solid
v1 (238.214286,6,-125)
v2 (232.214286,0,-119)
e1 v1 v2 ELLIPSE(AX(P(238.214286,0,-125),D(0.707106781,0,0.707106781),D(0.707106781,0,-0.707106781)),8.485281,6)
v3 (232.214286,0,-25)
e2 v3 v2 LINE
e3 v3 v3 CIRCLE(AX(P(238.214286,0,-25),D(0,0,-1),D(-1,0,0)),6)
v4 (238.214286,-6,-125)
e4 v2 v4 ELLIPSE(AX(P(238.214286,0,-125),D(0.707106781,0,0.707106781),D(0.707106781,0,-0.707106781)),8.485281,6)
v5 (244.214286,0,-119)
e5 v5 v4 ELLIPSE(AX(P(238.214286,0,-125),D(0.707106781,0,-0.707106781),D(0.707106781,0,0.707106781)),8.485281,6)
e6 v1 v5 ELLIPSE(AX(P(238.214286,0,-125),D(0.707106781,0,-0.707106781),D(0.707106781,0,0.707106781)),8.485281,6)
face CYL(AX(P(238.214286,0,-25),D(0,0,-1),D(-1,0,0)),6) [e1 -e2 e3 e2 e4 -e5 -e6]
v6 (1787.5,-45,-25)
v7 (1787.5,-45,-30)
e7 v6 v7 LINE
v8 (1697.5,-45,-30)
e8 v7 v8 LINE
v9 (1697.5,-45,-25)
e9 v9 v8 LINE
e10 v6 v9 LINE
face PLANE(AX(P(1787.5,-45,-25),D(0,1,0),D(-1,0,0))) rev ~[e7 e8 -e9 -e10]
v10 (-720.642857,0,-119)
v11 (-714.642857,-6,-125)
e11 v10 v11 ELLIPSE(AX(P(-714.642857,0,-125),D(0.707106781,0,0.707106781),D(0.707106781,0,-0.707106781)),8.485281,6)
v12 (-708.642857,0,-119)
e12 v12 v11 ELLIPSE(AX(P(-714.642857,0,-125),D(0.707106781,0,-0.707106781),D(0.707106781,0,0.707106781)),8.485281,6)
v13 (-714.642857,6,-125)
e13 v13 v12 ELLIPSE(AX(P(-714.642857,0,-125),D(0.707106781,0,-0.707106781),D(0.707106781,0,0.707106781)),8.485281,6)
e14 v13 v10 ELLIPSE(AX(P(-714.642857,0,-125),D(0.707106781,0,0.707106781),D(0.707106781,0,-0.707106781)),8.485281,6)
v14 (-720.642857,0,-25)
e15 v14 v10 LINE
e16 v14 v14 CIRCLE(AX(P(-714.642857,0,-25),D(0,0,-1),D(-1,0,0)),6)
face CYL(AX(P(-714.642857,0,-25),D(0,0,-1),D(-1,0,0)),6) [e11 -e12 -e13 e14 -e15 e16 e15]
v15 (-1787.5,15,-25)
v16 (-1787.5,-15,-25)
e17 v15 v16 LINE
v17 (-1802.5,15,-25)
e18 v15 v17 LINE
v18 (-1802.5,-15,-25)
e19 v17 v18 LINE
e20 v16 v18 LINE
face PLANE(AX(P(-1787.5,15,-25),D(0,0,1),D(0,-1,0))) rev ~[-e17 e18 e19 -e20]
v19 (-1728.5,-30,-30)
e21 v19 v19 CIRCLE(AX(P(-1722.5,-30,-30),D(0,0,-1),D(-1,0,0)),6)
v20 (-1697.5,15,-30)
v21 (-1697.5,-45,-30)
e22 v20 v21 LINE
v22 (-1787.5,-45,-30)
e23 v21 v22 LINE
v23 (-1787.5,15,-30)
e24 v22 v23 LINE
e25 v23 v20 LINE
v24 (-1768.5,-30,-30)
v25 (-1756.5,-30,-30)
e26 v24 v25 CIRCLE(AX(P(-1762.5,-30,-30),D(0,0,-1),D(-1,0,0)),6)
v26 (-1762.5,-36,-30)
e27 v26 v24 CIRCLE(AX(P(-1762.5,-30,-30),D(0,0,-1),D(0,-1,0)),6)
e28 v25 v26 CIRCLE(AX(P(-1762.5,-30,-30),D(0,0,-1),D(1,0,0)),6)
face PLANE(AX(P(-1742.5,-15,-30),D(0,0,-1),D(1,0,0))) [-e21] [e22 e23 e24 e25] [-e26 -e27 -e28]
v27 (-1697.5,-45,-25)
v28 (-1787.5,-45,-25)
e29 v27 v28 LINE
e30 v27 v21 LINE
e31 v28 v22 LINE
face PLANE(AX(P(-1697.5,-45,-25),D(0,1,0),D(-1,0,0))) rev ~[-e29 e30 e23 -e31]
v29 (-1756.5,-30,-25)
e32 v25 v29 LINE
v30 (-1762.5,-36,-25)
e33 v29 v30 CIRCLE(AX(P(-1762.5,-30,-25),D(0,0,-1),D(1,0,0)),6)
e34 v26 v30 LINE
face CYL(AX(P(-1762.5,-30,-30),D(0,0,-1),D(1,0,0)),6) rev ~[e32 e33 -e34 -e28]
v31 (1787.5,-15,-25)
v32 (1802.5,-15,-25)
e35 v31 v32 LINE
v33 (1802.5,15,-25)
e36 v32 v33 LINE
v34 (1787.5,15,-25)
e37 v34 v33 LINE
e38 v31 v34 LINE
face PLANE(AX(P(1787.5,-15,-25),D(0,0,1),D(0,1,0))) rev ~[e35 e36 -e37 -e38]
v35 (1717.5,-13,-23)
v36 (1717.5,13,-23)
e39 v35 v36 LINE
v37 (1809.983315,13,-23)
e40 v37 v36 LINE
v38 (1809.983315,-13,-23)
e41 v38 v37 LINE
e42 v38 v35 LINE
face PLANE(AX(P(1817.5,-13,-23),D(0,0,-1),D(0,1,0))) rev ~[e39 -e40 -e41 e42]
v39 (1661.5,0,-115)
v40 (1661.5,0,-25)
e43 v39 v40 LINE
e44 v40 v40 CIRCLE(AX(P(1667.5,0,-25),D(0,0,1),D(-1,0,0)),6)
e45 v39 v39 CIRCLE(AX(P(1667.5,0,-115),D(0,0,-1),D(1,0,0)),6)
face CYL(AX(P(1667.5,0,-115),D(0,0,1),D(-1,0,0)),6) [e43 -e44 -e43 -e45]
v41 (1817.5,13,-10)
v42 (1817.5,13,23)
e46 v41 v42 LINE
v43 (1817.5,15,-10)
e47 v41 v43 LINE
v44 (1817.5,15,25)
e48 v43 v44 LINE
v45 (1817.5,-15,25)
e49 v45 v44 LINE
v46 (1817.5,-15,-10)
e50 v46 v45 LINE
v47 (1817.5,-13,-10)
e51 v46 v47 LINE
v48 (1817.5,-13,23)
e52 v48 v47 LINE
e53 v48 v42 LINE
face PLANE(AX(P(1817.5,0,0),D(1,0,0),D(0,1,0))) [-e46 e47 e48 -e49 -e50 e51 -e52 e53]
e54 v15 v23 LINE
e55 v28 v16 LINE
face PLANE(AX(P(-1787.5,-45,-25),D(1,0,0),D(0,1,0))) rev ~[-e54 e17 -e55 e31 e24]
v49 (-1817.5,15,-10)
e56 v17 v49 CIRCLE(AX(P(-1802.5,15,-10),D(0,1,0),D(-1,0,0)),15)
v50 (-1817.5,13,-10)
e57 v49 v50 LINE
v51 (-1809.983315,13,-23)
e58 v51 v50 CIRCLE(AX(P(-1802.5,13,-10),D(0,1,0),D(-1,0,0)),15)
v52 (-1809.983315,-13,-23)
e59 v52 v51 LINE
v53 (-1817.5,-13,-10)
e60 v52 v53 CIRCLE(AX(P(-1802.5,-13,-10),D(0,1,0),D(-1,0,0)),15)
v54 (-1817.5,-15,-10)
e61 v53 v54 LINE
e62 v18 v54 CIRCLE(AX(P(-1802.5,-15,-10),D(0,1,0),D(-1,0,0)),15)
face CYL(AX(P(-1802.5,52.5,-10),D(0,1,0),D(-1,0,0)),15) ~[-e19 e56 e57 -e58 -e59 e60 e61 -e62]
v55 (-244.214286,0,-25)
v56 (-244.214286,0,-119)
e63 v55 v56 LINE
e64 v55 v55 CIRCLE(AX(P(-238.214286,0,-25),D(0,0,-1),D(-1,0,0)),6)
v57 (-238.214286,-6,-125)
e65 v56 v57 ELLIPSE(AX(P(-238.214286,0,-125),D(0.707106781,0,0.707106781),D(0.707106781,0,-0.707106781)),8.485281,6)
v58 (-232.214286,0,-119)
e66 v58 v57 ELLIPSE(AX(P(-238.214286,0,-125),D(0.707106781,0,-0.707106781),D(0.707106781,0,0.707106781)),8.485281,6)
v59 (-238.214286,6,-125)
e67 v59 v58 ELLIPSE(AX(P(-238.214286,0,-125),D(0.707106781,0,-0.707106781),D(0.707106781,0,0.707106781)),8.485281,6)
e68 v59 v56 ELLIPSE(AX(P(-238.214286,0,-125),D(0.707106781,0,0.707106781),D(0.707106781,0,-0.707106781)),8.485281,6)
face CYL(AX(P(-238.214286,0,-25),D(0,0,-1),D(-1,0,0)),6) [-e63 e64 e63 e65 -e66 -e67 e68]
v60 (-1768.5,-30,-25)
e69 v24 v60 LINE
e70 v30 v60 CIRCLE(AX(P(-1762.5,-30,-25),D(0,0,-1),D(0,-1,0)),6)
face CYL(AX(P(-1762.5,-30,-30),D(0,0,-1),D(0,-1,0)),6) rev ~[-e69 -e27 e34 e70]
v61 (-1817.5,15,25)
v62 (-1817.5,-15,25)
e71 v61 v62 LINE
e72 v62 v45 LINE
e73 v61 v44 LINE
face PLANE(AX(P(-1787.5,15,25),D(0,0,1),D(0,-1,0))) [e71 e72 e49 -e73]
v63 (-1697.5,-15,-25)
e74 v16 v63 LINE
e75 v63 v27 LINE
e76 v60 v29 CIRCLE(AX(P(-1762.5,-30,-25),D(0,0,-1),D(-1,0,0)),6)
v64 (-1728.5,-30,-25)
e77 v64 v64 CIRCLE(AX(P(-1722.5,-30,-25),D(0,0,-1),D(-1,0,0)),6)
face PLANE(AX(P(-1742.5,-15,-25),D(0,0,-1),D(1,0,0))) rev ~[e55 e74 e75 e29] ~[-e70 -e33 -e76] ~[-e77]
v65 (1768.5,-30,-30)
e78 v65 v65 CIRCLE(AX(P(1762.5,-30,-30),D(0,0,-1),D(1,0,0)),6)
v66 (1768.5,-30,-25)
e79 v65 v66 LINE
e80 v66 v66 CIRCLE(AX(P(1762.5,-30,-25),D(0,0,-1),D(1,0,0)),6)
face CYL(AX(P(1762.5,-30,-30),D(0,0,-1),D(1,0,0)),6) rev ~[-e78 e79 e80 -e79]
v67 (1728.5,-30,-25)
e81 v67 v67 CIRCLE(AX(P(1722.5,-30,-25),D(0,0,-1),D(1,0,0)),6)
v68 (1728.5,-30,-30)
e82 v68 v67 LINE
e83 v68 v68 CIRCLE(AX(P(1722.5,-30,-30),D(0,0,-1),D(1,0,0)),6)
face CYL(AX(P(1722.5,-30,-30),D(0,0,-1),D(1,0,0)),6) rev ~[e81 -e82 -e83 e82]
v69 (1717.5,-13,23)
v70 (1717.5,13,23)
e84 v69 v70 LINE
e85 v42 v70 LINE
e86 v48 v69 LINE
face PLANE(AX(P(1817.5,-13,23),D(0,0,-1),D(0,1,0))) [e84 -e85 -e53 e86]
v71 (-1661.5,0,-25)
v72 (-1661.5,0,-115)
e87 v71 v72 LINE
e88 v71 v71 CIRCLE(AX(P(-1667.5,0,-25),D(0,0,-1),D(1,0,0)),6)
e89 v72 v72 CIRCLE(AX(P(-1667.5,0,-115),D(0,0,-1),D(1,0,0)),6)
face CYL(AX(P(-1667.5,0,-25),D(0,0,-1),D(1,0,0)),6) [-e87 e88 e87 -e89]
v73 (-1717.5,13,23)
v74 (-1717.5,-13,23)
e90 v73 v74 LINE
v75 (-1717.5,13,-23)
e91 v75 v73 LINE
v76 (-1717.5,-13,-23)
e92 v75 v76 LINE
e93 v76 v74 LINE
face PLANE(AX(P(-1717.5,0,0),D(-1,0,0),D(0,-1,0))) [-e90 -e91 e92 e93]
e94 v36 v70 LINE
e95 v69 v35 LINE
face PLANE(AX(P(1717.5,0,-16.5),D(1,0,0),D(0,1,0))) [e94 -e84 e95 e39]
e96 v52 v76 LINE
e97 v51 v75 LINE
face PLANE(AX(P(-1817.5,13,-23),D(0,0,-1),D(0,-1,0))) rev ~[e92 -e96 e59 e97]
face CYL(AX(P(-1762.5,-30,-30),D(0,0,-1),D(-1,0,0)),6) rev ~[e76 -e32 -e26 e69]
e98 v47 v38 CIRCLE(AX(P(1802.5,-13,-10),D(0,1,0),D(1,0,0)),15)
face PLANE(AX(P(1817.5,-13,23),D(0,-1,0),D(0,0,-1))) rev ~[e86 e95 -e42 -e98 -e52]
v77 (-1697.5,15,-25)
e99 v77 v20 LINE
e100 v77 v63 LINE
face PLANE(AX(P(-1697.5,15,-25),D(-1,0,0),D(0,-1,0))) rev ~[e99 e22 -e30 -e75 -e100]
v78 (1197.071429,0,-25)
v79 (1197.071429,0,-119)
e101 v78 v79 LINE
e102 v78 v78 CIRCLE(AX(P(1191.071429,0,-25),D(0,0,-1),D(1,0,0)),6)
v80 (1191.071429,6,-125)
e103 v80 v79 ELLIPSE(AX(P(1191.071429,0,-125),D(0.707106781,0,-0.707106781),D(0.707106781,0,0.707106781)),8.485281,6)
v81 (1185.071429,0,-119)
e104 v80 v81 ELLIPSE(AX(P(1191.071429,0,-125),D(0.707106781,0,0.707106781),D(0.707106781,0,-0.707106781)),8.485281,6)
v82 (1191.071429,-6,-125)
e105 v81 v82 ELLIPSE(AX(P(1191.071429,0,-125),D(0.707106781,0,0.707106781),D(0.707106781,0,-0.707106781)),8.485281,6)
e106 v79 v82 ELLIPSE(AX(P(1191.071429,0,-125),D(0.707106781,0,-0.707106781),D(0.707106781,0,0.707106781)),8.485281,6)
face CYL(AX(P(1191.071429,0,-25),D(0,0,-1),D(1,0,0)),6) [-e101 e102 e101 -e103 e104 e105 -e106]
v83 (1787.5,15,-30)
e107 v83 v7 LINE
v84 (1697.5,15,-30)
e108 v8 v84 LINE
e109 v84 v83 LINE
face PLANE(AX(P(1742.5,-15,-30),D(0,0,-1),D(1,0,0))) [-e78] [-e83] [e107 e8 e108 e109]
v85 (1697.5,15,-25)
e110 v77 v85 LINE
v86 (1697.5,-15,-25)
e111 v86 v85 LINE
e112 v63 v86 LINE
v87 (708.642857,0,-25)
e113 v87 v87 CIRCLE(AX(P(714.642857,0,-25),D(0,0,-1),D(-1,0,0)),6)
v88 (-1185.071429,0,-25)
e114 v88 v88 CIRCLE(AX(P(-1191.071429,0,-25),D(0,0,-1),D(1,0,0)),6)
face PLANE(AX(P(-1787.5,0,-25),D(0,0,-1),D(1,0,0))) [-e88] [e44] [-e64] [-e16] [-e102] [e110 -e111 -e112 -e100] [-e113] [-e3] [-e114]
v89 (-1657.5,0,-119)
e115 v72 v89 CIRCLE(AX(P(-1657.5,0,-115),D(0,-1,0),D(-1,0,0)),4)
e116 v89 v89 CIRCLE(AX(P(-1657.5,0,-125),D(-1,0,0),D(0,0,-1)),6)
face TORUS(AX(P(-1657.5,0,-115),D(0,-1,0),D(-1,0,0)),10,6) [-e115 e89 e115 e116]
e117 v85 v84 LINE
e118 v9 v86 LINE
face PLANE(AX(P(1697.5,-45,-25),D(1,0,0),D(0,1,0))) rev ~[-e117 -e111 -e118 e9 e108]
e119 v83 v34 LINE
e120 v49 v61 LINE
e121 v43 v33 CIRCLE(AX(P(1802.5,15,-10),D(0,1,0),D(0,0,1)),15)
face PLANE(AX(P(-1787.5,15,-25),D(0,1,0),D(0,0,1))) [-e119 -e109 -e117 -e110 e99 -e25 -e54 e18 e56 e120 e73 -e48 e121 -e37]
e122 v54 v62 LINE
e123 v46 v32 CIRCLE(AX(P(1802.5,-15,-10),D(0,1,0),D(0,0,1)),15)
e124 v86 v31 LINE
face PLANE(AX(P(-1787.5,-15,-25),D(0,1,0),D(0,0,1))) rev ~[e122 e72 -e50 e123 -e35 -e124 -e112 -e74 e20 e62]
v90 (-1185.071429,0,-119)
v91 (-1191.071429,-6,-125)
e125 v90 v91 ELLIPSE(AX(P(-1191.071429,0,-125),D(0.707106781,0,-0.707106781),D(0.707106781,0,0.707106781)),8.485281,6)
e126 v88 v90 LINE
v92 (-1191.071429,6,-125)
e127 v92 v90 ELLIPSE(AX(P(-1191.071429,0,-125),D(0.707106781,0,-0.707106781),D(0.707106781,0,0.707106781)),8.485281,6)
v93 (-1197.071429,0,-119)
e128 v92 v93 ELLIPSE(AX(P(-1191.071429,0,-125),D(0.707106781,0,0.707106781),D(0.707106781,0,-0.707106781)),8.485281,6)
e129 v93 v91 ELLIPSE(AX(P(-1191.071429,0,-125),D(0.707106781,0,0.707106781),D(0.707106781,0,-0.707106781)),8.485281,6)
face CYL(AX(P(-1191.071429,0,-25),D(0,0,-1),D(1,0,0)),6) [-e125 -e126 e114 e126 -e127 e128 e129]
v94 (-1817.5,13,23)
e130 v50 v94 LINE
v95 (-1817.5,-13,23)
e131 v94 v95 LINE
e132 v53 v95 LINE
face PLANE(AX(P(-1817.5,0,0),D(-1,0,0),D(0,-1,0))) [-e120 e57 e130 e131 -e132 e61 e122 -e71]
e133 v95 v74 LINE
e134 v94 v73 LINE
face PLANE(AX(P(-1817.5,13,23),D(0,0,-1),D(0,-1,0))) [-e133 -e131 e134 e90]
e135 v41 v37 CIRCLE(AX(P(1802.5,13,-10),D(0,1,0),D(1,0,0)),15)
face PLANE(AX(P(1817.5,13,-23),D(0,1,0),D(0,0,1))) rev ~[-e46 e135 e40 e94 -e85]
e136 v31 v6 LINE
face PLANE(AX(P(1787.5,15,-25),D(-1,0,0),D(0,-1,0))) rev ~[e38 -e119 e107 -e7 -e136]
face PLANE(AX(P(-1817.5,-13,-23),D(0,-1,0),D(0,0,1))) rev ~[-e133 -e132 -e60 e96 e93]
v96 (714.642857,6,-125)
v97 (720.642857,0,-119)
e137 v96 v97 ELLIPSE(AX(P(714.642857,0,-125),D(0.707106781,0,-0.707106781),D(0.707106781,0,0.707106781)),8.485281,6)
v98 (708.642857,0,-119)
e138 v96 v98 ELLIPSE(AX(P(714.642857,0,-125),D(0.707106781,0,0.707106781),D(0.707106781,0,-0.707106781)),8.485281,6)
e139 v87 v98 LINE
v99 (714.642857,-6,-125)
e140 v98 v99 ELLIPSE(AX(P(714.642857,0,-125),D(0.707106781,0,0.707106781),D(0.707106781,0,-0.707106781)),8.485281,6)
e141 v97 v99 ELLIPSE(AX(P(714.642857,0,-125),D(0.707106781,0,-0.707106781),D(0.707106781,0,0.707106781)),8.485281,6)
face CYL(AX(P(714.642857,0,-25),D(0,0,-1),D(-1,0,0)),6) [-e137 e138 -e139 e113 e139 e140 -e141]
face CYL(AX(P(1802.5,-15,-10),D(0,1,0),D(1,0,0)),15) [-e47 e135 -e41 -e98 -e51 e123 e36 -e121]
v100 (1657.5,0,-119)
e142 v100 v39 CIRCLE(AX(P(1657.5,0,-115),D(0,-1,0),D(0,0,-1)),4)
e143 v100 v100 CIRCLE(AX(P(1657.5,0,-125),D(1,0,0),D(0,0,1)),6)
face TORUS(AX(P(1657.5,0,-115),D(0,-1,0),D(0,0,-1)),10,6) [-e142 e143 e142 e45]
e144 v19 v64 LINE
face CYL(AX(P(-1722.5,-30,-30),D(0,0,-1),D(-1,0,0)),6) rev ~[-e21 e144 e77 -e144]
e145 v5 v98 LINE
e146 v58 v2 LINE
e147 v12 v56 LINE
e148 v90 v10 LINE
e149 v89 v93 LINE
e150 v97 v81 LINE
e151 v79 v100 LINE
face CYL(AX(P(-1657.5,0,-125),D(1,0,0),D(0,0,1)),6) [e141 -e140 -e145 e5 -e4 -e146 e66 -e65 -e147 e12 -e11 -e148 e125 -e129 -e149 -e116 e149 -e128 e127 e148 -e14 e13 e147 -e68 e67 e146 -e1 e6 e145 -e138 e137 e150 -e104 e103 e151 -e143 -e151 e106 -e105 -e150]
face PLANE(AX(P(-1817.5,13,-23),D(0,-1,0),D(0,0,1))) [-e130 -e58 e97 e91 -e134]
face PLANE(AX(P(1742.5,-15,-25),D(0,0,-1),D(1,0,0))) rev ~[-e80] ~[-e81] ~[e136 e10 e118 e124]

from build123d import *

# Parameters (mm, degrees)
F0_W          = 3575
F0_H          = 50
F1_DEPTH      = 15
F1_DEPTH_BACK = 15
F3_DEPTH      = 5
F5_DEPTH      = 5
F6_R          = 6
F7_DEPTH      = 5
F8_R          = 6
F9_DEPTH      = 5
F10_R         = 6
F21_DEPTH     = 5
F22_W         = 30
F22_H         = 50
F23_DEPTH     = 30
F24_R         = 15
F25_W         = 26
F25_H         = 13
F25_H_2       = 33
F26_DEPTH     = 100
F27_W         = 30
F27_H         = 50
F28_DEPTH     = 30
F29_W         = 26
F29_H         = 46
F30_DEPTH     = 100
F31_T1_DEPTH  = 105


# Not quite as in the source:
# - a fillet or chamfer that OpenCascade refuses, or shapes differently, is made with other operations: its cross-section is extruded or revolved along the edge and cut away or added


with BuildPart() as f1:
    # F0 (on Front) → F1 (new body, two sides)
    with BuildSketch(Plane.XZ) as f1_sk:
        Rectangle(F0_W, F0_H)
    extrude(amount=F1_DEPTH)
    extrude(f1_sk.sketch, amount=-F1_DEPTH_BACK)

    # F2 (on face) → F3 (join)
    with BuildSketch(Plane(origin=(0, 0, -25), x_dir=(1, 0, 0), z_dir=(0, 0, -1))):
        Polygon((-1787.5, 45), (-1787.5, 15), (-1787.5, -15), (-1697.5, -15), (-1697.5, 45), align=None)
    extrude(amount=F3_DEPTH)

    # F4 (on face) → F5 (join)
    with BuildSketch(Plane(origin=(0, 0, -25), x_dir=(1, 0, 0), z_dir=(0, 0, -1))):
        Polygon((1787.5, -15), (1787.5, 15), (1787.5, 45), (1697.5, 45), (1697.5, -15), align=None)
    extrude(amount=F5_DEPTH)

    # F6 (on face) → F7 (cut, through all)
    with BuildSketch(Plane(origin=(0, 0, -30), x_dir=(1, 0, 0), z_dir=(0, 0, -1))):
        with Locations((-935, 30)):
            Circle(F6_R)
        with Locations((-975, 30)):
            Circle(F6_R)
    extrude(amount=-F7_DEPTH, mode=Mode.SUBTRACT)

    # F8 (on face) → F9 (cut, through all)
    with BuildSketch(Plane(origin=(0, 0, -30), x_dir=(1, 0, 0), z_dir=(0, 0, -1))):
        with Locations((1762.5, 30)):
            Circle(F8_R)
        with Locations((1722.5, 30)):
            Circle(F8_R)
    extrude(amount=-F9_DEPTH, mode=Mode.SUBTRACT)

    # F12: sweep along a path in F11
    with BuildLine(Plane.XZ) as f12_path:
        Line((-1667.5, -25), (-1667.5, -115))
        ThreePointArc((-1667.5, -115), (-1664.5710678119, -122.0710678119), (-1657.5, -125))
        Line((-1657.5, -125), (1657.5, -125))
        ThreePointArc((1657.5, -125), (1664.5710678119, -122.0710678119), (1667.5, -115))
        Line((1667.5, -115), (1667.5, -25))
    # F10 (on face) → F12 (sweep)
    with BuildSketch(Plane(origin=(0, 0, -25), x_dir=(1, 0, 0), z_dir=(0, 0, -1))):
        with Locations((-1667.5, 0)):
            Circle(F10_R)
    sweep(path=f12_path.line)

    # F13: sweep along a path in F11
    with BuildLine(Plane.XZ) as f13_path:
        Line((-1191.0714285714, -25), (-1191.0714285714, -125))
    # F10 (on face) → F13 (sweep)
    with BuildSketch(Plane(origin=(0, 0, -25), x_dir=(1, 0, 0), z_dir=(0, 0, -1))):
        with BuildLine():
            Line((-1191.0714285714, 0), (-1197.0714285714, 0))
            ThreePointArc((-1197.0714285714, 0), (-1191.0714285714, -6), (-1185.0714285714, 0))
            Line((-1185.0714285714, 0), (-1191.0714285714, 0))
        make_face()
        with BuildLine():
            ThreePointArc((-1185.0714285714, 0), (-1191.0714285714, 6), (-1197.0714285714, 0))
            Line((-1197.0714285714, 0), (-1191.0714285714, 0))
            Line((-1191.0714285714, 0), (-1185.0714285714, 0))
        make_face()
    sweep(path=f13_path.line)

    # F14: sweep along a path in F11
    with BuildLine(Plane.XZ) as f14_path:
        Line((-714.6428571429, -25), (-714.6428571429, -125))
    # F10 (on face) → F14 (sweep)
    with BuildSketch(Plane(origin=(0, 0, -25), x_dir=(1, 0, 0), z_dir=(0, 0, -1))):
        with BuildLine():
            ThreePointArc((-708.6428571429, 0), (-714.6428571429, 6), (-720.6428571429, 0))
            Line((-720.6428571429, 0), (-714.6428571429, 0))
            Line((-714.6428571429, 0), (-708.6428571429, 0))
        make_face()
        with BuildLine():
            Line((-714.6428571429, 0), (-720.6428571429, 0))
            ThreePointArc((-720.6428571429, 0), (-714.6428571429, -6), (-708.6428571429, 0))
            Line((-708.6428571429, 0), (-714.6428571429, 0))
        make_face()
    sweep(path=f14_path.line)

    # F15: sweep along a path in F11
    with BuildLine(Plane.XZ) as f15_path:
        Line((-238.2142857143, -25), (-238.2142857143, -125))
    # F10 (on face) → F15 (sweep)
    with BuildSketch(Plane(origin=(0, 0, -25), x_dir=(1, 0, 0), z_dir=(0, 0, -1))):
        with BuildLine():
            ThreePointArc((-232.2142857143, 0), (-238.2142857143, 6), (-244.2142857143, 0))
            Line((-244.2142857143, 0), (-238.2142857143, 0))
            Line((-238.2142857143, 0), (-232.2142857143, 0))
        make_face()
        with BuildLine():
            Line((-238.2142857143, 0), (-244.2142857143, 0))
            ThreePointArc((-244.2142857143, 0), (-238.2142857143, -6), (-232.2142857143, 0))
            Line((-232.2142857143, 0), (-238.2142857143, 0))
        make_face()
    sweep(path=f15_path.line)

    # F16: sweep along a path in F11
    with BuildLine(Plane.XZ) as f16_path:
        Line((-1667.5, -25), (-1667.5, -115))
        ThreePointArc((-1667.5, -115), (-1664.5710678119, -122.0710678119), (-1657.5, -125))
        Line((-1657.5, -125), (1657.5, -125))
        ThreePointArc((1657.5, -125), (1664.5710678119, -122.0710678119), (1667.5, -115))
    # F10 (on face) → F16 (sweep)
    with BuildSketch(Plane(origin=(0, 0, -25), x_dir=(1, 0, 0), z_dir=(0, 0, -1))):
        with Locations((-1667.5, 0)):
            Circle(F10_R)
    sweep(path=f16_path.line)

    # F17: sweep along a path in F11
    with BuildLine(Plane.XZ) as f17_path:
        Line((238.2142857143, -25), (238.2142857143, -125))
    # F10 (on face) → F17 (sweep)
    with BuildSketch(Plane(origin=(0, 0, -25), x_dir=(1, 0, 0), z_dir=(0, 0, -1))):
        with BuildLine():
            ThreePointArc((244.2142857143, 0), (238.2142857143, 6), (232.2142857143, 0))
            Line((232.2142857143, 0), (238.2142857143, 0))
            Line((238.2142857143, 0), (244.2142857143, 0))
        make_face()
        with BuildLine():
            Line((238.2142857143, 0), (232.2142857143, 0))
            ThreePointArc((232.2142857143, 0), (238.2142857143, -6), (244.2142857143, 0))
            Line((244.2142857143, 0), (238.2142857143, 0))
        make_face()
    sweep(path=f17_path.line)

    # F18: sweep along a path in F11
    with BuildLine(Plane.XZ) as f18_path:
        Line((714.6428571429, -25), (714.6428571429, -125))
    # F10 (on face) → F18 (sweep)
    with BuildSketch(Plane(origin=(0, 0, -25), x_dir=(1, 0, 0), z_dir=(0, 0, -1))):
        with BuildLine():
            ThreePointArc((720.6428571429, 0), (714.6428571429, 6), (708.6428571429, 0))
            Line((708.6428571429, 0), (714.6428571429, 0))
            Line((714.6428571429, 0), (720.6428571429, 0))
        make_face()
        with BuildLine():
            Line((714.6428571429, 0), (708.6428571429, 0))
            ThreePointArc((708.6428571429, 0), (714.6428571429, -6), (720.6428571429, 0))
            Line((720.6428571429, 0), (714.6428571429, 0))
        make_face()
    sweep(path=f18_path.line)

    # F19: sweep along a path in F11
    with BuildLine(Plane.XZ) as f19_path:
        Line((1191.0714285714, -25), (1191.0714285714, -125))
    # F10 (on face) → F19 (sweep)
    with BuildSketch(Plane(origin=(0, 0, -25), x_dir=(1, 0, 0), z_dir=(0, 0, -1))):
        with BuildLine():
            Line((1191.0714285714, 0), (1185.0714285714, 0))
            ThreePointArc((1185.0714285714, 0), (1191.0714285714, -6), (1197.0714285714, 0))
            Line((1197.0714285714, 0), (1191.0714285714, 0))
        make_face()
        with BuildLine():
            ThreePointArc((1197.0714285714, 0), (1191.0714285714, 6), (1185.0714285714, 0))
            Line((1185.0714285714, 0), (1191.0714285714, 0))
            Line((1191.0714285714, 0), (1197.0714285714, 0))
        make_face()
    sweep(path=f19_path.line)

    # F20 (on face) → F21 (cut, through all)
    with BuildSketch(Plane(origin=(0, 0, -30), x_dir=(1, 0, 0), z_dir=(0, 0, -1))):
        with BuildLine():
            ThreePointArc((-1762.5, 36), (-1766.7426406871, 34.2426406871), (-1768.5, 30))
            Line((-1768.5, 30), (-1762.5, 30))
            Line((-1762.5, 30), (-1762.5, 36))
        make_face()
        with BuildLine():
            ThreePointArc((-1716.5, 30), (-1722.5, 36), (-1728.5, 30))
            ThreePointArc((-1728.5, 30), (-1722.5, 24), (-1716.5, 30))
        make_face()
        with BuildLine():
            Line((-1762.5, 30), (-1768.5, 30))
            ThreePointArc((-1768.5, 30), (-1762.5, 24), (-1756.5, 30))
            Line((-1756.5, 30), (-1762.5, 30))
        make_face()
        with BuildLine():
            Line((-1762.5, 36), (-1762.5, 30))
            Line((-1762.5, 30), (-1756.5, 30))
            ThreePointArc((-1756.5, 30), (-1758.2573593129, 34.2426406871), (-1762.5, 36))
        make_face()
    extrude(amount=-F21_DEPTH, mode=Mode.SUBTRACT)

    # F22 (on face) → F23 (join)
    with BuildSketch(Plane.YZ.offset(1787.5)):
        Rectangle(F22_W, F22_H)
    extrude(amount=F23_DEPTH)

    # F24
    f24_edges = [f1.edges().sort_by_distance(p)[0] for p in [
        (1817.5, 0, -25),
    ]]
    fillet(f24_edges, radius=F24_R)

    # F25 (on face) → F26 (cut)
    with BuildSketch(Plane.YZ.offset(1817.5)):
        with Locations((0, -16.5)):
            Rectangle(F25_W, F25_H)
        with Locations((0, 6.5)):
            Rectangle(F25_W, F25_H_2)
    extrude(amount=-F26_DEPTH, mode=Mode.SUBTRACT)

    # F27 (on face) → F28 (join)
    with BuildSketch(Plane(origin=(-1787.5, 0, 0), x_dir=(0, -1, 0), z_dir=(-1, 0, 0))):
        Rectangle(F27_W, F27_H)
    extrude(amount=F28_DEPTH)

    # F29 (on face) → F30 (cut)
    with BuildSketch(Plane(origin=(-1817.5, 0, 0), x_dir=(0, -1, 0), z_dir=(-1, 0, 0))):
        Rectangle(F29_W, F29_H)
    extrude(amount=-F30_DEPTH, mode=Mode.SUBTRACT)

    # F31: fillet of radius 15 on 1 edges, made by hand

    # F31_s2 → F31_t1 (cut)
    with BuildSketch(Plane.XZ.offset(-52.5)):
        with BuildLine():
            ThreePointArc((-1817.5, -10), (-1813.1066017178, -20.6066017178), (-1802.5, -25))
            Line((-1802.5, -25), (-1817.5, -25))
            Line((-1817.5, -25), (-1817.5, -10))
        make_face()
    extrude(amount=F31_T1_DEPTH, mode=Mode.SUBTRACT)


solid = f1.part
